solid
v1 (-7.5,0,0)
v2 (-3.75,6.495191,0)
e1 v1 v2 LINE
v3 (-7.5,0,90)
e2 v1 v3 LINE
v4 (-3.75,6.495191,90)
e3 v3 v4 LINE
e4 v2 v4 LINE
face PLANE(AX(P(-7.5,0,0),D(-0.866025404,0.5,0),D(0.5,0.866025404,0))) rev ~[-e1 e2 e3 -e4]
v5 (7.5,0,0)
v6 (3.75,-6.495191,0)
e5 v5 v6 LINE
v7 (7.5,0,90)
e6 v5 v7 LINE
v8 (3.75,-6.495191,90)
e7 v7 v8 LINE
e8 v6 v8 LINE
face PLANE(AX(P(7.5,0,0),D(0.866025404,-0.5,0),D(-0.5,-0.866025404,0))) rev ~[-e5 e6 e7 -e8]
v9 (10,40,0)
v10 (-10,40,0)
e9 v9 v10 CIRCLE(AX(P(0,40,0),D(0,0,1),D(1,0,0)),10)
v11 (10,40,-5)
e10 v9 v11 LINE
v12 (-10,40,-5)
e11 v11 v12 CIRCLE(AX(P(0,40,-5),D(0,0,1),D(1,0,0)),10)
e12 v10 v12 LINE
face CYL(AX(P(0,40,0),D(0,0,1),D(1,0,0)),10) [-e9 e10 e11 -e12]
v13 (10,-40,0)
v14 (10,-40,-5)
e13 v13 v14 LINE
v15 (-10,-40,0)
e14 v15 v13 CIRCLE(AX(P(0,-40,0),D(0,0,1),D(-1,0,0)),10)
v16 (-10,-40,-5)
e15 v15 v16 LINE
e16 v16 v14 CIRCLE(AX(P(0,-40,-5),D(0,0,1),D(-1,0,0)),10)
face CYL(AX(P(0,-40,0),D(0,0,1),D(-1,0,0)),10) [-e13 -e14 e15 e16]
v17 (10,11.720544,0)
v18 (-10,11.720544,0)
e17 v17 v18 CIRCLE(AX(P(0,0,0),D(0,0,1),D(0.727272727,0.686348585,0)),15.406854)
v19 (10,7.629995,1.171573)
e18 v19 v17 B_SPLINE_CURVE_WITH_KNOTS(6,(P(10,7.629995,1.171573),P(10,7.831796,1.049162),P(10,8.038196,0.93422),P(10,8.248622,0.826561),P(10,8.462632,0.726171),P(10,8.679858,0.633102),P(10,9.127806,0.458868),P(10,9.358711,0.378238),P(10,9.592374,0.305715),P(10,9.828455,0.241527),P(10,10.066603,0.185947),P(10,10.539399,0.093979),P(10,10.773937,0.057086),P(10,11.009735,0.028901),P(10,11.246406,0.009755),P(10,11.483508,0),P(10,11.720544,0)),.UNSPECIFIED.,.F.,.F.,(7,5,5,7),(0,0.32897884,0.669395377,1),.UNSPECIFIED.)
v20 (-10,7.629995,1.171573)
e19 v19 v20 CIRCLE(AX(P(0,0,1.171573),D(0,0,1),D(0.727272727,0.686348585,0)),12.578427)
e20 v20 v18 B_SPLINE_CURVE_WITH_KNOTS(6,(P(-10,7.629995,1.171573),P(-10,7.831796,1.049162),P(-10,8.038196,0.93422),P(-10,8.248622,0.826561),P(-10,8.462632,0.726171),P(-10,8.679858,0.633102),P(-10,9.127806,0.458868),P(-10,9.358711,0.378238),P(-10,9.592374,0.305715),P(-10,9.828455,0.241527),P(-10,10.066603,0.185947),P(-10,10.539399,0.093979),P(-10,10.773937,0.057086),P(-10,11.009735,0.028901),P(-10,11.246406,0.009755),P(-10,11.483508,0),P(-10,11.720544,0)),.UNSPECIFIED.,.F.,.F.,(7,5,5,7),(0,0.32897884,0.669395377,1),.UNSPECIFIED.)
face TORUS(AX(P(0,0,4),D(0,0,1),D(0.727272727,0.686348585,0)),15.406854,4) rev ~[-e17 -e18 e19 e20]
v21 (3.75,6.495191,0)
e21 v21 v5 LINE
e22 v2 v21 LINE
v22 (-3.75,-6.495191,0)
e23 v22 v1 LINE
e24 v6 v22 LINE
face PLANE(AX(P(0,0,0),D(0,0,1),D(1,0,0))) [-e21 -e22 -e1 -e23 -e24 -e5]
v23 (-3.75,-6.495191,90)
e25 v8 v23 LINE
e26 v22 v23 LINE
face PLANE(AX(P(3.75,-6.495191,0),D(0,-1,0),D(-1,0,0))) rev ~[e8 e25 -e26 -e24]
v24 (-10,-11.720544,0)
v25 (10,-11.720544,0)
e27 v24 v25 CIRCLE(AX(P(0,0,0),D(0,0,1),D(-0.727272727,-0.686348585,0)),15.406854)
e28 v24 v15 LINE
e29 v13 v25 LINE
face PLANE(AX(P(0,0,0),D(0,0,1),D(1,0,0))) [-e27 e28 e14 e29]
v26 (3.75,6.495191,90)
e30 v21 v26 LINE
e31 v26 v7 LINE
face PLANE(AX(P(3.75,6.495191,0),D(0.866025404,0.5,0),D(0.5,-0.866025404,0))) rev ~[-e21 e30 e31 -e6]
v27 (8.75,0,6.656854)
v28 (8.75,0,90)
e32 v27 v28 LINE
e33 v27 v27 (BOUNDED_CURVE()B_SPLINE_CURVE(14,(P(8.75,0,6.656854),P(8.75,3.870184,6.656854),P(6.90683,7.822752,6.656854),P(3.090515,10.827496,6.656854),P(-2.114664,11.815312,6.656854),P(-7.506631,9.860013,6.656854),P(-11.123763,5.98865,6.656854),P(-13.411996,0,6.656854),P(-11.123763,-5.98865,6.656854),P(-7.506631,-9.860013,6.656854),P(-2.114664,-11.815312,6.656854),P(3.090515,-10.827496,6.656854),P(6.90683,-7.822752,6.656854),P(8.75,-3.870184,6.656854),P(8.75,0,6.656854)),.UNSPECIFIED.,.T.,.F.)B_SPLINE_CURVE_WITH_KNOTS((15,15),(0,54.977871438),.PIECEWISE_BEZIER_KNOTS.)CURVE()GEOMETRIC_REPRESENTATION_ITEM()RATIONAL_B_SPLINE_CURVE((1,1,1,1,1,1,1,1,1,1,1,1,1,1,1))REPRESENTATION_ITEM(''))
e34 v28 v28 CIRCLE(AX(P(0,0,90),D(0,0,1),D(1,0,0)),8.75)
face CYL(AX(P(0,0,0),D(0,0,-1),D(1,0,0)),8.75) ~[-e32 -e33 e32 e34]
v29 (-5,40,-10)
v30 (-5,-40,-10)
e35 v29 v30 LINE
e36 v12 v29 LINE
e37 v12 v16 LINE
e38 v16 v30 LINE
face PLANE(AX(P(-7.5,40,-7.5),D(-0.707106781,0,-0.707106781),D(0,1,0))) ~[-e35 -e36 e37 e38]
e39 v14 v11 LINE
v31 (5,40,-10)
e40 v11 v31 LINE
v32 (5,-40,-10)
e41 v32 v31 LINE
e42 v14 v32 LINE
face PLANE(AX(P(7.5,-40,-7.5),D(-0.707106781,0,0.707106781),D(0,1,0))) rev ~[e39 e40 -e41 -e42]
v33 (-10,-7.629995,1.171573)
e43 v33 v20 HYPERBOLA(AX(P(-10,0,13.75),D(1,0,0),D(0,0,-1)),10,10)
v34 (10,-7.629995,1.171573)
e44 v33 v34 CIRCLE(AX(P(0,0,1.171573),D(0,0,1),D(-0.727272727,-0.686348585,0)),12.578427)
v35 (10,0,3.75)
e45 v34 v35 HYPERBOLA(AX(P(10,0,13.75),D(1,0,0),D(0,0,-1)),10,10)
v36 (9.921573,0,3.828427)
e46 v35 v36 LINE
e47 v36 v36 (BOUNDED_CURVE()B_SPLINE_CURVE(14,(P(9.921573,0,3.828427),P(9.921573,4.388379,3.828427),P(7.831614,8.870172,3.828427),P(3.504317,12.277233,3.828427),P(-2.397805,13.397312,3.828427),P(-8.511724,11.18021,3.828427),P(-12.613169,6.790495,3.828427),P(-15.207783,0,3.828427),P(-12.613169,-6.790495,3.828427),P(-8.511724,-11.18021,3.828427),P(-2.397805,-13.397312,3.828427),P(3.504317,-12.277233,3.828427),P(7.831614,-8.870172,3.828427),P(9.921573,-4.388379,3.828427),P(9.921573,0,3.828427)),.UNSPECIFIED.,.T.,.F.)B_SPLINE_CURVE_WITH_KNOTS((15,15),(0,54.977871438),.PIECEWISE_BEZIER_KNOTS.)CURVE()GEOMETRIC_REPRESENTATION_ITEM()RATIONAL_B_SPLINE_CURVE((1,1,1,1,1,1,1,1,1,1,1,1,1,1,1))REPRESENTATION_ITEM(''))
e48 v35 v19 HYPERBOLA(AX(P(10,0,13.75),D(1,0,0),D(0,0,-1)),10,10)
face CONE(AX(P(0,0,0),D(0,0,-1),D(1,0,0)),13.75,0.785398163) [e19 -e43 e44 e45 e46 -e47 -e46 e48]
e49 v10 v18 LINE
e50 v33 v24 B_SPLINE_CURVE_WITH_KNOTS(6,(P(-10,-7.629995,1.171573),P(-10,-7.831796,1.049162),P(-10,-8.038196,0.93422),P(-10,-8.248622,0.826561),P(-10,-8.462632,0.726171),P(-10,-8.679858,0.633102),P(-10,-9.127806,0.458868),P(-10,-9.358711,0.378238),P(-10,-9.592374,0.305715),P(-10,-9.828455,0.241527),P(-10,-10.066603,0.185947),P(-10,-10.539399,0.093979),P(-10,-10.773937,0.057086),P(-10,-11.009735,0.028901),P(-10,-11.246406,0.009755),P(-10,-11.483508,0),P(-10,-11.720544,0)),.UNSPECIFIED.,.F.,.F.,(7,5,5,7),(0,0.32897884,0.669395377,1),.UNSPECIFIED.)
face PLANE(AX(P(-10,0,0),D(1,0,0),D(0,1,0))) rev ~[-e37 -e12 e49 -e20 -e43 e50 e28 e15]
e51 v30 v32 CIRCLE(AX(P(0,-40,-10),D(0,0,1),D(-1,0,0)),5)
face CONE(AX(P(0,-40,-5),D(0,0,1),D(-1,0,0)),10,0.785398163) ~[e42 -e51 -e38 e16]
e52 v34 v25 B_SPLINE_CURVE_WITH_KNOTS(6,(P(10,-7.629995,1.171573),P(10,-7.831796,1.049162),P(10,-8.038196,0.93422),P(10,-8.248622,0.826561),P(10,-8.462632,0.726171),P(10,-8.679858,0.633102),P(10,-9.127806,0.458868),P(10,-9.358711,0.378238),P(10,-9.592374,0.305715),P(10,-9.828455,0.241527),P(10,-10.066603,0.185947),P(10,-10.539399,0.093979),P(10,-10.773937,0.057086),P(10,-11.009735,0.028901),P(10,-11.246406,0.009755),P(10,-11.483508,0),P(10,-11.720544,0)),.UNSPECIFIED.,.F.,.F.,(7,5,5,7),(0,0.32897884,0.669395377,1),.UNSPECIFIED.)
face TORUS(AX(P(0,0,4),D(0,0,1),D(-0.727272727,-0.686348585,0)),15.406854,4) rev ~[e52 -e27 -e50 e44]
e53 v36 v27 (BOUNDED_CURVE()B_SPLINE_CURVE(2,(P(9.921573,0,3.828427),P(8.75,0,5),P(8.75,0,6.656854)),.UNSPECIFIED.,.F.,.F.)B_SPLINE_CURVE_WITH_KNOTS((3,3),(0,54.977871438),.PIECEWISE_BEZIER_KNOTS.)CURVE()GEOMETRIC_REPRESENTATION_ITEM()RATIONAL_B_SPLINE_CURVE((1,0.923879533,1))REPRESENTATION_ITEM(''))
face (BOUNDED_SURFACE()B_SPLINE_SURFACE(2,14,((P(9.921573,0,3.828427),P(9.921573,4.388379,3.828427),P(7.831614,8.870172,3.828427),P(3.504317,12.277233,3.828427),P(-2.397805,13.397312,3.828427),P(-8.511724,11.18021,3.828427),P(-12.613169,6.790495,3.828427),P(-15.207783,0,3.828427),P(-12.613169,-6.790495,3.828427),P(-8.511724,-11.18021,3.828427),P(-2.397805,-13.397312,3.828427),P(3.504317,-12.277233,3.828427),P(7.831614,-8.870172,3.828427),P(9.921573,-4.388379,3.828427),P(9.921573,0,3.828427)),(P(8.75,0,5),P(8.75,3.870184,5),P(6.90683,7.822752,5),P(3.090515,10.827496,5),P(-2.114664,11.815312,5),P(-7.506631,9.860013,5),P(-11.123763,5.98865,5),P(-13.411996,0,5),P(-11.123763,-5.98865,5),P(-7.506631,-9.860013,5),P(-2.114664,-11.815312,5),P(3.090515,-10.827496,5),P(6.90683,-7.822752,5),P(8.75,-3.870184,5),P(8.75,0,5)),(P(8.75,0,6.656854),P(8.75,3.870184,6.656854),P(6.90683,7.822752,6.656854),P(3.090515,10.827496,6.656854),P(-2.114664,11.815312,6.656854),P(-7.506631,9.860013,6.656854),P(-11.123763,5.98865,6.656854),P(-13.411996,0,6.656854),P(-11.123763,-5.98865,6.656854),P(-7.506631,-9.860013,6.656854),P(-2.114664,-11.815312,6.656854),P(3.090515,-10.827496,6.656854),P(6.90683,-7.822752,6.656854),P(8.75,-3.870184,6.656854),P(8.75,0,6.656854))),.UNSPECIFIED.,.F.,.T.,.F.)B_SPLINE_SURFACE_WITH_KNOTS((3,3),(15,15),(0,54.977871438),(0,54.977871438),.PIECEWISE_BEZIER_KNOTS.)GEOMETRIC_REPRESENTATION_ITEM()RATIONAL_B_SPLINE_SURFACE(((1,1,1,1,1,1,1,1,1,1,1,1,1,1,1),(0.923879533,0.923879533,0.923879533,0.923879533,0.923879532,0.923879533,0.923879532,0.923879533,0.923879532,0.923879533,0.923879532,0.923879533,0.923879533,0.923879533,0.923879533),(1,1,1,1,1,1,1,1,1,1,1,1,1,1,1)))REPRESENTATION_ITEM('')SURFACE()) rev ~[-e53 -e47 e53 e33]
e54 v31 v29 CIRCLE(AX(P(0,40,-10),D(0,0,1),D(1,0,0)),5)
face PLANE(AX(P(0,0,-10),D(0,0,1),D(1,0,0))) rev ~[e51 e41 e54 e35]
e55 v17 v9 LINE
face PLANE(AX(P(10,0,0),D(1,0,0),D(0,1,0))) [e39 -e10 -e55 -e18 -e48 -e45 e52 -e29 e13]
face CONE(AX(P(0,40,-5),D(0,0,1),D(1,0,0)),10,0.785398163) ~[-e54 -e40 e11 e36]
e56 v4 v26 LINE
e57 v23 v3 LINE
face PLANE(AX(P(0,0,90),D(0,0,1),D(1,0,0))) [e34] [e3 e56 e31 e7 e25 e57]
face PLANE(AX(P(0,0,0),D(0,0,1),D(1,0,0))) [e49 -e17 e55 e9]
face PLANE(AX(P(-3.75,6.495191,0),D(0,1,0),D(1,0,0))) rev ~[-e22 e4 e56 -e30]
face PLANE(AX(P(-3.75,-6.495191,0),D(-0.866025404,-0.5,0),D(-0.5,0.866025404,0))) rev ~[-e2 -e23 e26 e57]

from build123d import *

# Parameters (mm, degrees)
F0_R     = 8.75
F1_DEPTH = 90
F3_DEPTH = 10
F5_R     = 4
F6_SIZE  = 5


# Not quite as in the source:
# - a fillet or chamfer that OpenCascade refuses, or shapes differently, is made with other operations: its cross-section is extruded or revolved along the edge and cut away or added


with BuildPart() as f1:
    # F0 (on Top) → F1 (new body)
    with BuildSketch(Plane.XY):
        Circle(F0_R)
        Polygon((3.75, 6.4951905284), (7.5, 0), (3.75, -6.4951905284), (-3.75, -6.4951905284), (-7.5, 0), (-3.75, 6.4951905284), align=None, mode=Mode.SUBTRACT)
    extrude(amount=F1_DEPTH)

    # F2 (on Top) → F3 (join)
    with BuildSketch(Plane.XY):
        with BuildLine():
            ThreePointArc((10, 40), (0, 50), (-10, 40))
            Line((-10, 40), (-10, 0))
            Line((-10, 0), (-10, -40))
            ThreePointArc((-10, -40), (0, -50), (10, -40))
            Line((10, -40), (10, 0))
            Line((10, 0), (10, 40))
        make_face()
    extrude(amount=-F3_DEPTH)

    # F4: chamfer of 5 on 1 edges, made by hand


with BuildPart() as f4_tool2:
    # F4_s3 → F4_t4 (revolve)
    with BuildSketch(Plane.XZ):
        Polygon((13.75, 0), (8.75, 5), (8.75, 0), align=None)
    revolve(axis=Axis((0, 0, 0), (0, 0, 1)))

    split(bisect_by=Plane.YZ.offset(10), keep=Keep.BOTTOM)

    split(bisect_by=Plane.YZ.offset(-10), keep=Keep.TOP)


with BuildPart() as f1_1:
    add(f1.part)

    # F4_t1: union F4_tool2
    add(f4_tool2.part)

    # F5
    f5_edges = [f1_1.edges().sort_by_distance(p)[0] for p in [
        (0, -13.75, 0),
        (0, 13.75, 0),
        (-8.75, 0, 5),
    ]]
    fillet(f5_edges, radius=F5_R)

    # F6
    f6_edges = [f1_1.edges().sort_by_distance(p)[0] for p in [
        (10, 0, -10),
    ]]
    chamfer(f6_edges, length=F6_SIZE)


solid = f1_1.part
